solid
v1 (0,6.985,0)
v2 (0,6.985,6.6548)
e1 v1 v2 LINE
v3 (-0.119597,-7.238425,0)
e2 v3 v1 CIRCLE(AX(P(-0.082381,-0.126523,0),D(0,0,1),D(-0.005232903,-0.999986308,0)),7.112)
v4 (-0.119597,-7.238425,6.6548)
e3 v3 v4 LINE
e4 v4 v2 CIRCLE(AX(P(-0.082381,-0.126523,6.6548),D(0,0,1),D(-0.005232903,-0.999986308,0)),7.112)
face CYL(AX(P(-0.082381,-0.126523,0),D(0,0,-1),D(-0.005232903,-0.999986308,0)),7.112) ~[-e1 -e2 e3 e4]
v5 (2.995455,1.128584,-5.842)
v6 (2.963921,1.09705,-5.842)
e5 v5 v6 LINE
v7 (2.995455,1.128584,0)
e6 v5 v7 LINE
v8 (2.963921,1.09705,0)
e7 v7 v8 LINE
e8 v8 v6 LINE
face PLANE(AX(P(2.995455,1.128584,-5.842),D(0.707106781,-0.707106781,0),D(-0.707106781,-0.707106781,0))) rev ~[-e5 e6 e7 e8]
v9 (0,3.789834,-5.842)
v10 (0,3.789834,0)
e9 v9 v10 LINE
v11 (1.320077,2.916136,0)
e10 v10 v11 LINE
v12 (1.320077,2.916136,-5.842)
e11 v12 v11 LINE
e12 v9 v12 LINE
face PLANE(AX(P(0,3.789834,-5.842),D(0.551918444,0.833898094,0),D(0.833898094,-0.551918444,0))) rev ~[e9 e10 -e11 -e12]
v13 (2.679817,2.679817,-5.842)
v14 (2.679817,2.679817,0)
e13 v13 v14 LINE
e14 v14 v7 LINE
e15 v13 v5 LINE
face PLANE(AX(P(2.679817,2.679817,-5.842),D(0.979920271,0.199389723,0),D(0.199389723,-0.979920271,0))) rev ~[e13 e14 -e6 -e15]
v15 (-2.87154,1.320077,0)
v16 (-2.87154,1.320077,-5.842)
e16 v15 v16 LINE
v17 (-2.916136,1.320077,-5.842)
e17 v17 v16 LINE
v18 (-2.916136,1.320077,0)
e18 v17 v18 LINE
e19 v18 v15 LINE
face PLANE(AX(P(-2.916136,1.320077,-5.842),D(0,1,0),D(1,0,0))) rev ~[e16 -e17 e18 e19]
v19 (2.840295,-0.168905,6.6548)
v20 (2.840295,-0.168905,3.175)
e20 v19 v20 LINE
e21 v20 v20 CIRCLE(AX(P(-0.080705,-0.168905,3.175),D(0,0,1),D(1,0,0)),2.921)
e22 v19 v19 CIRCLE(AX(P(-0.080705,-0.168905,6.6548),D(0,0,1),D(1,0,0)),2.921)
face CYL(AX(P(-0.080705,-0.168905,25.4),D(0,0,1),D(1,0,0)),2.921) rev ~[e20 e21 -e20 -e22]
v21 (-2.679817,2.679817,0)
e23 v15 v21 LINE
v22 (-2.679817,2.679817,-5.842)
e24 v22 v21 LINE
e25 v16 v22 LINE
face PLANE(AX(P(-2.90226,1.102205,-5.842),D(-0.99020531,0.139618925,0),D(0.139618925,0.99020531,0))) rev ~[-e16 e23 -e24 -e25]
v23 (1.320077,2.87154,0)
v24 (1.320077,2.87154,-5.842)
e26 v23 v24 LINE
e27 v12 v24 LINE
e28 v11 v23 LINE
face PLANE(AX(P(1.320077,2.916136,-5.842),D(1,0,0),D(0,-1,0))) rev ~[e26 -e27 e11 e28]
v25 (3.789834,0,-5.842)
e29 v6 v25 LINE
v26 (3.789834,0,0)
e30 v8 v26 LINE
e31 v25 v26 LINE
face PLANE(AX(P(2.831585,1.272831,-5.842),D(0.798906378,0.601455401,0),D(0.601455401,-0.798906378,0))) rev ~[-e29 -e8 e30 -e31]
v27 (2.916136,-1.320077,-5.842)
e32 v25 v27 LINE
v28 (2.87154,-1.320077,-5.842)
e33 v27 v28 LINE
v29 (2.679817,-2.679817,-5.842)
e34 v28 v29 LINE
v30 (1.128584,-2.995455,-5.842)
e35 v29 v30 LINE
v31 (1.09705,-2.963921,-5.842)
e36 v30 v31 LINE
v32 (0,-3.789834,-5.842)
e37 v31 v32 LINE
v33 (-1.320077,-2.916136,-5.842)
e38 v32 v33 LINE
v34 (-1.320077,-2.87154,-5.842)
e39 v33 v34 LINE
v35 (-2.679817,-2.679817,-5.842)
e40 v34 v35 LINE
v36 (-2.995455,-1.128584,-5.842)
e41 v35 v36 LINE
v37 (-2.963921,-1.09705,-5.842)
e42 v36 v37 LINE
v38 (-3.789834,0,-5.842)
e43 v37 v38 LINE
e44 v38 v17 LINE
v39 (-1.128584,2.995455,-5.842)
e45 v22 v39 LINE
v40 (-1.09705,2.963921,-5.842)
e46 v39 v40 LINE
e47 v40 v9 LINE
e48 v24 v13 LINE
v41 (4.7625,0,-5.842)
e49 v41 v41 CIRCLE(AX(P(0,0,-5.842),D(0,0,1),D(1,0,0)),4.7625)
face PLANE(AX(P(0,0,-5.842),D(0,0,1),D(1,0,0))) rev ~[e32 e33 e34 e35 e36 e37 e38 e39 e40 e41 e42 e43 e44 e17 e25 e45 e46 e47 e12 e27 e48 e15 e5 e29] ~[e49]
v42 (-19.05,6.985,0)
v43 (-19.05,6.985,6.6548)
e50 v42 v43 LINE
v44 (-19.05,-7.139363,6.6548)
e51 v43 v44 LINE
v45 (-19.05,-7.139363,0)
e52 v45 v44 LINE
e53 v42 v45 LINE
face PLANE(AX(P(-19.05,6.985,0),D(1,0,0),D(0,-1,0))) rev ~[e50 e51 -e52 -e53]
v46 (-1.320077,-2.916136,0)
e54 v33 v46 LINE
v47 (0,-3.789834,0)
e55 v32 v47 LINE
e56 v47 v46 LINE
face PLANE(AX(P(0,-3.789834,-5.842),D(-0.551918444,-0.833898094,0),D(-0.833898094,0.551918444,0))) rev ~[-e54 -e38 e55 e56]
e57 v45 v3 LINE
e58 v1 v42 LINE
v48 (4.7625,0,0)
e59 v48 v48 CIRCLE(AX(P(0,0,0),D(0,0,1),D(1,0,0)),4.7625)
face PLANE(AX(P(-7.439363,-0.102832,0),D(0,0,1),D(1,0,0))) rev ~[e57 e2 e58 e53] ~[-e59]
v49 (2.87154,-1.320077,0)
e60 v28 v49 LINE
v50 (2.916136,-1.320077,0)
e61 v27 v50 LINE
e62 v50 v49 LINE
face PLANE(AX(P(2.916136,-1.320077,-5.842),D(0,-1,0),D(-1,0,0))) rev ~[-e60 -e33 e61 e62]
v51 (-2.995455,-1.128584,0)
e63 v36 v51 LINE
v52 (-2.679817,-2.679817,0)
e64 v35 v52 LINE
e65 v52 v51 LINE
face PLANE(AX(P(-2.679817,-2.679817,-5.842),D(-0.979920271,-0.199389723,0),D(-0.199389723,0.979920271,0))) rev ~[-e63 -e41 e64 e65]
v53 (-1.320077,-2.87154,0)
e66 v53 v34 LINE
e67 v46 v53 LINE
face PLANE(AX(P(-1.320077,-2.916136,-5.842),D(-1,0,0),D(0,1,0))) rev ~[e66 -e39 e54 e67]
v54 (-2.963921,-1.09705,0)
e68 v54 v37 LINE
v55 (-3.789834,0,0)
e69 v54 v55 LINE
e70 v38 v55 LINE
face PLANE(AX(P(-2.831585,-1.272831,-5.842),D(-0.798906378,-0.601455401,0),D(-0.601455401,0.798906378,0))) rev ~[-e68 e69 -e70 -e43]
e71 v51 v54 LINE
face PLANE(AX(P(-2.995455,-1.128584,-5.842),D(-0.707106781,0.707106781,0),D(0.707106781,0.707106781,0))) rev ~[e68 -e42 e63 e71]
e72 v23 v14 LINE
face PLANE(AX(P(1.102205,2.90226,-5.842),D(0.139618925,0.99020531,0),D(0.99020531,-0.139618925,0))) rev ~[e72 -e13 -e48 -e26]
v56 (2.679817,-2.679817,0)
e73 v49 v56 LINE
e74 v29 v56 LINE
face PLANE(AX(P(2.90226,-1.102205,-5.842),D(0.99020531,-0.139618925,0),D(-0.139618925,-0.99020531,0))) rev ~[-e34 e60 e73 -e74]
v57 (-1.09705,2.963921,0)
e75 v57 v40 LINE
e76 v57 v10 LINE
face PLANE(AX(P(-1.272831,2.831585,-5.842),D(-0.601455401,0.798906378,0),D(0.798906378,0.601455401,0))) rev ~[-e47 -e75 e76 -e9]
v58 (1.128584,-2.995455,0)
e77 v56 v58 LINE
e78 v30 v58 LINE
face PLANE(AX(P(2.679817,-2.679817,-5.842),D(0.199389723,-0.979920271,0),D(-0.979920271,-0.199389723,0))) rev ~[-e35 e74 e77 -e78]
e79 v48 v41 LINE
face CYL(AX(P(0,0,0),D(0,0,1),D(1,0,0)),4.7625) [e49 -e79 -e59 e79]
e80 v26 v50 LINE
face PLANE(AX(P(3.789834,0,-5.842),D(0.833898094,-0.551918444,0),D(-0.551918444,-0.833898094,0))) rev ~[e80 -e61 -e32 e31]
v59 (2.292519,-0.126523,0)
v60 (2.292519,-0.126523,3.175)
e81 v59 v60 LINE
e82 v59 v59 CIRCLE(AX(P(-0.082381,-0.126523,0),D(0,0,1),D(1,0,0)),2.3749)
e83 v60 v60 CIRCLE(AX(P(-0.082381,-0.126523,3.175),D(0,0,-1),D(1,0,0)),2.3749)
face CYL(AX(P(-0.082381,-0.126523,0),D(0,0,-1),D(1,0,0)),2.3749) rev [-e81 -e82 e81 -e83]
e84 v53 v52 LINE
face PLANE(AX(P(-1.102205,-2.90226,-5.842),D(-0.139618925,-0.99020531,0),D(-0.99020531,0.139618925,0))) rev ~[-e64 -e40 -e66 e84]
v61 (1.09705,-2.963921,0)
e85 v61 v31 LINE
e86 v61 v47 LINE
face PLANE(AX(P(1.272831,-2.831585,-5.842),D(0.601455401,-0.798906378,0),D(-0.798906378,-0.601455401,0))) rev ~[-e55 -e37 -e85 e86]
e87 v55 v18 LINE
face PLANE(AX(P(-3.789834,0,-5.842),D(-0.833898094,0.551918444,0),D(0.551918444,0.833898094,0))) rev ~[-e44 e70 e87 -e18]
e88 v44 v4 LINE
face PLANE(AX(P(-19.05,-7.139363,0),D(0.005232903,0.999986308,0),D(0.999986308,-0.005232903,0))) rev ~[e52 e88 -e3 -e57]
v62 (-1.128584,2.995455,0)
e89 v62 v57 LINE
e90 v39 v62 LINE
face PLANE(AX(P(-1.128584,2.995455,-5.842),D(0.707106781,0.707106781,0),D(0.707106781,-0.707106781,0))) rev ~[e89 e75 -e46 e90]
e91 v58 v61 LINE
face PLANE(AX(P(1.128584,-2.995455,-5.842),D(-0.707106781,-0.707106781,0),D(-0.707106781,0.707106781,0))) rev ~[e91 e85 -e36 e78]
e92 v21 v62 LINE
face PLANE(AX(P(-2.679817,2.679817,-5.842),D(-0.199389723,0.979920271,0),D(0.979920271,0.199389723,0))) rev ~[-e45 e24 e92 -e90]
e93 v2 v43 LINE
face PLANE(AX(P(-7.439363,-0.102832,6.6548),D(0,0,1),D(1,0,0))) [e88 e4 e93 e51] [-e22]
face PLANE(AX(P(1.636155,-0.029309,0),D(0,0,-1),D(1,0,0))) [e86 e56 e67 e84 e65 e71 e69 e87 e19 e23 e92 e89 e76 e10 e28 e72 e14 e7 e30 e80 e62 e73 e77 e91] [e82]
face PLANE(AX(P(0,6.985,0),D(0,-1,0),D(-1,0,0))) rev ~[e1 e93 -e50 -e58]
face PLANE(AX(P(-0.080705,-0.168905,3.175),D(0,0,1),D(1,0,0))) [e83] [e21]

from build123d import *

# Parameters (mm, degrees)
F0_R            = 2.3749
F1_DEPTH        = 6.6548
F2_R            = 4.7625
F3_DEPTH        = 5.842
F5_DEPTH        = 5.842
F5_COPIES_COUNT = 8
F7_R            = 2.921
F8_DEPTH        = 22.225


# Not quite as in the source:
# - a pattern or mirror of a feature is missing from the dataset's text; its kind, count and spacing are read off the source's solid


with BuildPart() as f1:
    # F0 (on Top) → F1 (new body)
    with BuildSketch(Plane.XY):
        with BuildLine():
            ThreePointArc((-0.1195971757, -7.2384254858), (7.0293678249, -0.1863217508), (0, 6.985))
            Line((0, 6.985), (-19.05, 6.985))
            Line((-19.05, 6.985), (-19.05, 0))
            Line((-19.05, 0), (-19.05, -7.1393631719))
            Line((-19.05, -7.1393631719), (-0.1195971757, -7.2384254858))
        make_face()
        with Locations((-0.0823807711, -0.1265228614)):
            Circle(F0_R, mode=Mode.SUBTRACT)
    extrude(amount=F1_DEPTH)

    # F2 (on Top) → F3 (join)
    with BuildSketch(Plane.XY):
        Circle(F2_R)
    extrude(amount=-F3_DEPTH)

    # F4 (on face) → F5 (cut)
    with BuildSketch(Plane(origin=(0, 0, -5.842), x_dir=(1, 0, 0), z_dir=(0, 0, -1))):
        Polygon((0, 1.3200769899), (0, 0), (0, -1.2728312286), (2.831584774, -1.2728312286), (3.7898337469, 0), (2.916136058, 1.3200769899), align=None)
    f5 = extrude(amount=-F5_DEPTH, mode=Mode.SUBTRACT)

    # F5_copies: F5 ×8 about axis
    f5_copies_axis = Axis((0, 0, 0), (0, 0, 1))
    for i in range(1, F5_COPIES_COUNT):
        add(f5.rotate(f5_copies_axis, i * 360 / F5_COPIES_COUNT), mode=Mode.SUBTRACT)

    # F7 (on offset) → F8 (cut)
    with BuildSketch(Plane.XY.offset(25.4)):
        with Locations((-0.0807045596, -0.1689054021)):
            Circle(F7_R)
    extrude(amount=-F8_DEPTH, mode=Mode.SUBTRACT)


solid = f1.part
